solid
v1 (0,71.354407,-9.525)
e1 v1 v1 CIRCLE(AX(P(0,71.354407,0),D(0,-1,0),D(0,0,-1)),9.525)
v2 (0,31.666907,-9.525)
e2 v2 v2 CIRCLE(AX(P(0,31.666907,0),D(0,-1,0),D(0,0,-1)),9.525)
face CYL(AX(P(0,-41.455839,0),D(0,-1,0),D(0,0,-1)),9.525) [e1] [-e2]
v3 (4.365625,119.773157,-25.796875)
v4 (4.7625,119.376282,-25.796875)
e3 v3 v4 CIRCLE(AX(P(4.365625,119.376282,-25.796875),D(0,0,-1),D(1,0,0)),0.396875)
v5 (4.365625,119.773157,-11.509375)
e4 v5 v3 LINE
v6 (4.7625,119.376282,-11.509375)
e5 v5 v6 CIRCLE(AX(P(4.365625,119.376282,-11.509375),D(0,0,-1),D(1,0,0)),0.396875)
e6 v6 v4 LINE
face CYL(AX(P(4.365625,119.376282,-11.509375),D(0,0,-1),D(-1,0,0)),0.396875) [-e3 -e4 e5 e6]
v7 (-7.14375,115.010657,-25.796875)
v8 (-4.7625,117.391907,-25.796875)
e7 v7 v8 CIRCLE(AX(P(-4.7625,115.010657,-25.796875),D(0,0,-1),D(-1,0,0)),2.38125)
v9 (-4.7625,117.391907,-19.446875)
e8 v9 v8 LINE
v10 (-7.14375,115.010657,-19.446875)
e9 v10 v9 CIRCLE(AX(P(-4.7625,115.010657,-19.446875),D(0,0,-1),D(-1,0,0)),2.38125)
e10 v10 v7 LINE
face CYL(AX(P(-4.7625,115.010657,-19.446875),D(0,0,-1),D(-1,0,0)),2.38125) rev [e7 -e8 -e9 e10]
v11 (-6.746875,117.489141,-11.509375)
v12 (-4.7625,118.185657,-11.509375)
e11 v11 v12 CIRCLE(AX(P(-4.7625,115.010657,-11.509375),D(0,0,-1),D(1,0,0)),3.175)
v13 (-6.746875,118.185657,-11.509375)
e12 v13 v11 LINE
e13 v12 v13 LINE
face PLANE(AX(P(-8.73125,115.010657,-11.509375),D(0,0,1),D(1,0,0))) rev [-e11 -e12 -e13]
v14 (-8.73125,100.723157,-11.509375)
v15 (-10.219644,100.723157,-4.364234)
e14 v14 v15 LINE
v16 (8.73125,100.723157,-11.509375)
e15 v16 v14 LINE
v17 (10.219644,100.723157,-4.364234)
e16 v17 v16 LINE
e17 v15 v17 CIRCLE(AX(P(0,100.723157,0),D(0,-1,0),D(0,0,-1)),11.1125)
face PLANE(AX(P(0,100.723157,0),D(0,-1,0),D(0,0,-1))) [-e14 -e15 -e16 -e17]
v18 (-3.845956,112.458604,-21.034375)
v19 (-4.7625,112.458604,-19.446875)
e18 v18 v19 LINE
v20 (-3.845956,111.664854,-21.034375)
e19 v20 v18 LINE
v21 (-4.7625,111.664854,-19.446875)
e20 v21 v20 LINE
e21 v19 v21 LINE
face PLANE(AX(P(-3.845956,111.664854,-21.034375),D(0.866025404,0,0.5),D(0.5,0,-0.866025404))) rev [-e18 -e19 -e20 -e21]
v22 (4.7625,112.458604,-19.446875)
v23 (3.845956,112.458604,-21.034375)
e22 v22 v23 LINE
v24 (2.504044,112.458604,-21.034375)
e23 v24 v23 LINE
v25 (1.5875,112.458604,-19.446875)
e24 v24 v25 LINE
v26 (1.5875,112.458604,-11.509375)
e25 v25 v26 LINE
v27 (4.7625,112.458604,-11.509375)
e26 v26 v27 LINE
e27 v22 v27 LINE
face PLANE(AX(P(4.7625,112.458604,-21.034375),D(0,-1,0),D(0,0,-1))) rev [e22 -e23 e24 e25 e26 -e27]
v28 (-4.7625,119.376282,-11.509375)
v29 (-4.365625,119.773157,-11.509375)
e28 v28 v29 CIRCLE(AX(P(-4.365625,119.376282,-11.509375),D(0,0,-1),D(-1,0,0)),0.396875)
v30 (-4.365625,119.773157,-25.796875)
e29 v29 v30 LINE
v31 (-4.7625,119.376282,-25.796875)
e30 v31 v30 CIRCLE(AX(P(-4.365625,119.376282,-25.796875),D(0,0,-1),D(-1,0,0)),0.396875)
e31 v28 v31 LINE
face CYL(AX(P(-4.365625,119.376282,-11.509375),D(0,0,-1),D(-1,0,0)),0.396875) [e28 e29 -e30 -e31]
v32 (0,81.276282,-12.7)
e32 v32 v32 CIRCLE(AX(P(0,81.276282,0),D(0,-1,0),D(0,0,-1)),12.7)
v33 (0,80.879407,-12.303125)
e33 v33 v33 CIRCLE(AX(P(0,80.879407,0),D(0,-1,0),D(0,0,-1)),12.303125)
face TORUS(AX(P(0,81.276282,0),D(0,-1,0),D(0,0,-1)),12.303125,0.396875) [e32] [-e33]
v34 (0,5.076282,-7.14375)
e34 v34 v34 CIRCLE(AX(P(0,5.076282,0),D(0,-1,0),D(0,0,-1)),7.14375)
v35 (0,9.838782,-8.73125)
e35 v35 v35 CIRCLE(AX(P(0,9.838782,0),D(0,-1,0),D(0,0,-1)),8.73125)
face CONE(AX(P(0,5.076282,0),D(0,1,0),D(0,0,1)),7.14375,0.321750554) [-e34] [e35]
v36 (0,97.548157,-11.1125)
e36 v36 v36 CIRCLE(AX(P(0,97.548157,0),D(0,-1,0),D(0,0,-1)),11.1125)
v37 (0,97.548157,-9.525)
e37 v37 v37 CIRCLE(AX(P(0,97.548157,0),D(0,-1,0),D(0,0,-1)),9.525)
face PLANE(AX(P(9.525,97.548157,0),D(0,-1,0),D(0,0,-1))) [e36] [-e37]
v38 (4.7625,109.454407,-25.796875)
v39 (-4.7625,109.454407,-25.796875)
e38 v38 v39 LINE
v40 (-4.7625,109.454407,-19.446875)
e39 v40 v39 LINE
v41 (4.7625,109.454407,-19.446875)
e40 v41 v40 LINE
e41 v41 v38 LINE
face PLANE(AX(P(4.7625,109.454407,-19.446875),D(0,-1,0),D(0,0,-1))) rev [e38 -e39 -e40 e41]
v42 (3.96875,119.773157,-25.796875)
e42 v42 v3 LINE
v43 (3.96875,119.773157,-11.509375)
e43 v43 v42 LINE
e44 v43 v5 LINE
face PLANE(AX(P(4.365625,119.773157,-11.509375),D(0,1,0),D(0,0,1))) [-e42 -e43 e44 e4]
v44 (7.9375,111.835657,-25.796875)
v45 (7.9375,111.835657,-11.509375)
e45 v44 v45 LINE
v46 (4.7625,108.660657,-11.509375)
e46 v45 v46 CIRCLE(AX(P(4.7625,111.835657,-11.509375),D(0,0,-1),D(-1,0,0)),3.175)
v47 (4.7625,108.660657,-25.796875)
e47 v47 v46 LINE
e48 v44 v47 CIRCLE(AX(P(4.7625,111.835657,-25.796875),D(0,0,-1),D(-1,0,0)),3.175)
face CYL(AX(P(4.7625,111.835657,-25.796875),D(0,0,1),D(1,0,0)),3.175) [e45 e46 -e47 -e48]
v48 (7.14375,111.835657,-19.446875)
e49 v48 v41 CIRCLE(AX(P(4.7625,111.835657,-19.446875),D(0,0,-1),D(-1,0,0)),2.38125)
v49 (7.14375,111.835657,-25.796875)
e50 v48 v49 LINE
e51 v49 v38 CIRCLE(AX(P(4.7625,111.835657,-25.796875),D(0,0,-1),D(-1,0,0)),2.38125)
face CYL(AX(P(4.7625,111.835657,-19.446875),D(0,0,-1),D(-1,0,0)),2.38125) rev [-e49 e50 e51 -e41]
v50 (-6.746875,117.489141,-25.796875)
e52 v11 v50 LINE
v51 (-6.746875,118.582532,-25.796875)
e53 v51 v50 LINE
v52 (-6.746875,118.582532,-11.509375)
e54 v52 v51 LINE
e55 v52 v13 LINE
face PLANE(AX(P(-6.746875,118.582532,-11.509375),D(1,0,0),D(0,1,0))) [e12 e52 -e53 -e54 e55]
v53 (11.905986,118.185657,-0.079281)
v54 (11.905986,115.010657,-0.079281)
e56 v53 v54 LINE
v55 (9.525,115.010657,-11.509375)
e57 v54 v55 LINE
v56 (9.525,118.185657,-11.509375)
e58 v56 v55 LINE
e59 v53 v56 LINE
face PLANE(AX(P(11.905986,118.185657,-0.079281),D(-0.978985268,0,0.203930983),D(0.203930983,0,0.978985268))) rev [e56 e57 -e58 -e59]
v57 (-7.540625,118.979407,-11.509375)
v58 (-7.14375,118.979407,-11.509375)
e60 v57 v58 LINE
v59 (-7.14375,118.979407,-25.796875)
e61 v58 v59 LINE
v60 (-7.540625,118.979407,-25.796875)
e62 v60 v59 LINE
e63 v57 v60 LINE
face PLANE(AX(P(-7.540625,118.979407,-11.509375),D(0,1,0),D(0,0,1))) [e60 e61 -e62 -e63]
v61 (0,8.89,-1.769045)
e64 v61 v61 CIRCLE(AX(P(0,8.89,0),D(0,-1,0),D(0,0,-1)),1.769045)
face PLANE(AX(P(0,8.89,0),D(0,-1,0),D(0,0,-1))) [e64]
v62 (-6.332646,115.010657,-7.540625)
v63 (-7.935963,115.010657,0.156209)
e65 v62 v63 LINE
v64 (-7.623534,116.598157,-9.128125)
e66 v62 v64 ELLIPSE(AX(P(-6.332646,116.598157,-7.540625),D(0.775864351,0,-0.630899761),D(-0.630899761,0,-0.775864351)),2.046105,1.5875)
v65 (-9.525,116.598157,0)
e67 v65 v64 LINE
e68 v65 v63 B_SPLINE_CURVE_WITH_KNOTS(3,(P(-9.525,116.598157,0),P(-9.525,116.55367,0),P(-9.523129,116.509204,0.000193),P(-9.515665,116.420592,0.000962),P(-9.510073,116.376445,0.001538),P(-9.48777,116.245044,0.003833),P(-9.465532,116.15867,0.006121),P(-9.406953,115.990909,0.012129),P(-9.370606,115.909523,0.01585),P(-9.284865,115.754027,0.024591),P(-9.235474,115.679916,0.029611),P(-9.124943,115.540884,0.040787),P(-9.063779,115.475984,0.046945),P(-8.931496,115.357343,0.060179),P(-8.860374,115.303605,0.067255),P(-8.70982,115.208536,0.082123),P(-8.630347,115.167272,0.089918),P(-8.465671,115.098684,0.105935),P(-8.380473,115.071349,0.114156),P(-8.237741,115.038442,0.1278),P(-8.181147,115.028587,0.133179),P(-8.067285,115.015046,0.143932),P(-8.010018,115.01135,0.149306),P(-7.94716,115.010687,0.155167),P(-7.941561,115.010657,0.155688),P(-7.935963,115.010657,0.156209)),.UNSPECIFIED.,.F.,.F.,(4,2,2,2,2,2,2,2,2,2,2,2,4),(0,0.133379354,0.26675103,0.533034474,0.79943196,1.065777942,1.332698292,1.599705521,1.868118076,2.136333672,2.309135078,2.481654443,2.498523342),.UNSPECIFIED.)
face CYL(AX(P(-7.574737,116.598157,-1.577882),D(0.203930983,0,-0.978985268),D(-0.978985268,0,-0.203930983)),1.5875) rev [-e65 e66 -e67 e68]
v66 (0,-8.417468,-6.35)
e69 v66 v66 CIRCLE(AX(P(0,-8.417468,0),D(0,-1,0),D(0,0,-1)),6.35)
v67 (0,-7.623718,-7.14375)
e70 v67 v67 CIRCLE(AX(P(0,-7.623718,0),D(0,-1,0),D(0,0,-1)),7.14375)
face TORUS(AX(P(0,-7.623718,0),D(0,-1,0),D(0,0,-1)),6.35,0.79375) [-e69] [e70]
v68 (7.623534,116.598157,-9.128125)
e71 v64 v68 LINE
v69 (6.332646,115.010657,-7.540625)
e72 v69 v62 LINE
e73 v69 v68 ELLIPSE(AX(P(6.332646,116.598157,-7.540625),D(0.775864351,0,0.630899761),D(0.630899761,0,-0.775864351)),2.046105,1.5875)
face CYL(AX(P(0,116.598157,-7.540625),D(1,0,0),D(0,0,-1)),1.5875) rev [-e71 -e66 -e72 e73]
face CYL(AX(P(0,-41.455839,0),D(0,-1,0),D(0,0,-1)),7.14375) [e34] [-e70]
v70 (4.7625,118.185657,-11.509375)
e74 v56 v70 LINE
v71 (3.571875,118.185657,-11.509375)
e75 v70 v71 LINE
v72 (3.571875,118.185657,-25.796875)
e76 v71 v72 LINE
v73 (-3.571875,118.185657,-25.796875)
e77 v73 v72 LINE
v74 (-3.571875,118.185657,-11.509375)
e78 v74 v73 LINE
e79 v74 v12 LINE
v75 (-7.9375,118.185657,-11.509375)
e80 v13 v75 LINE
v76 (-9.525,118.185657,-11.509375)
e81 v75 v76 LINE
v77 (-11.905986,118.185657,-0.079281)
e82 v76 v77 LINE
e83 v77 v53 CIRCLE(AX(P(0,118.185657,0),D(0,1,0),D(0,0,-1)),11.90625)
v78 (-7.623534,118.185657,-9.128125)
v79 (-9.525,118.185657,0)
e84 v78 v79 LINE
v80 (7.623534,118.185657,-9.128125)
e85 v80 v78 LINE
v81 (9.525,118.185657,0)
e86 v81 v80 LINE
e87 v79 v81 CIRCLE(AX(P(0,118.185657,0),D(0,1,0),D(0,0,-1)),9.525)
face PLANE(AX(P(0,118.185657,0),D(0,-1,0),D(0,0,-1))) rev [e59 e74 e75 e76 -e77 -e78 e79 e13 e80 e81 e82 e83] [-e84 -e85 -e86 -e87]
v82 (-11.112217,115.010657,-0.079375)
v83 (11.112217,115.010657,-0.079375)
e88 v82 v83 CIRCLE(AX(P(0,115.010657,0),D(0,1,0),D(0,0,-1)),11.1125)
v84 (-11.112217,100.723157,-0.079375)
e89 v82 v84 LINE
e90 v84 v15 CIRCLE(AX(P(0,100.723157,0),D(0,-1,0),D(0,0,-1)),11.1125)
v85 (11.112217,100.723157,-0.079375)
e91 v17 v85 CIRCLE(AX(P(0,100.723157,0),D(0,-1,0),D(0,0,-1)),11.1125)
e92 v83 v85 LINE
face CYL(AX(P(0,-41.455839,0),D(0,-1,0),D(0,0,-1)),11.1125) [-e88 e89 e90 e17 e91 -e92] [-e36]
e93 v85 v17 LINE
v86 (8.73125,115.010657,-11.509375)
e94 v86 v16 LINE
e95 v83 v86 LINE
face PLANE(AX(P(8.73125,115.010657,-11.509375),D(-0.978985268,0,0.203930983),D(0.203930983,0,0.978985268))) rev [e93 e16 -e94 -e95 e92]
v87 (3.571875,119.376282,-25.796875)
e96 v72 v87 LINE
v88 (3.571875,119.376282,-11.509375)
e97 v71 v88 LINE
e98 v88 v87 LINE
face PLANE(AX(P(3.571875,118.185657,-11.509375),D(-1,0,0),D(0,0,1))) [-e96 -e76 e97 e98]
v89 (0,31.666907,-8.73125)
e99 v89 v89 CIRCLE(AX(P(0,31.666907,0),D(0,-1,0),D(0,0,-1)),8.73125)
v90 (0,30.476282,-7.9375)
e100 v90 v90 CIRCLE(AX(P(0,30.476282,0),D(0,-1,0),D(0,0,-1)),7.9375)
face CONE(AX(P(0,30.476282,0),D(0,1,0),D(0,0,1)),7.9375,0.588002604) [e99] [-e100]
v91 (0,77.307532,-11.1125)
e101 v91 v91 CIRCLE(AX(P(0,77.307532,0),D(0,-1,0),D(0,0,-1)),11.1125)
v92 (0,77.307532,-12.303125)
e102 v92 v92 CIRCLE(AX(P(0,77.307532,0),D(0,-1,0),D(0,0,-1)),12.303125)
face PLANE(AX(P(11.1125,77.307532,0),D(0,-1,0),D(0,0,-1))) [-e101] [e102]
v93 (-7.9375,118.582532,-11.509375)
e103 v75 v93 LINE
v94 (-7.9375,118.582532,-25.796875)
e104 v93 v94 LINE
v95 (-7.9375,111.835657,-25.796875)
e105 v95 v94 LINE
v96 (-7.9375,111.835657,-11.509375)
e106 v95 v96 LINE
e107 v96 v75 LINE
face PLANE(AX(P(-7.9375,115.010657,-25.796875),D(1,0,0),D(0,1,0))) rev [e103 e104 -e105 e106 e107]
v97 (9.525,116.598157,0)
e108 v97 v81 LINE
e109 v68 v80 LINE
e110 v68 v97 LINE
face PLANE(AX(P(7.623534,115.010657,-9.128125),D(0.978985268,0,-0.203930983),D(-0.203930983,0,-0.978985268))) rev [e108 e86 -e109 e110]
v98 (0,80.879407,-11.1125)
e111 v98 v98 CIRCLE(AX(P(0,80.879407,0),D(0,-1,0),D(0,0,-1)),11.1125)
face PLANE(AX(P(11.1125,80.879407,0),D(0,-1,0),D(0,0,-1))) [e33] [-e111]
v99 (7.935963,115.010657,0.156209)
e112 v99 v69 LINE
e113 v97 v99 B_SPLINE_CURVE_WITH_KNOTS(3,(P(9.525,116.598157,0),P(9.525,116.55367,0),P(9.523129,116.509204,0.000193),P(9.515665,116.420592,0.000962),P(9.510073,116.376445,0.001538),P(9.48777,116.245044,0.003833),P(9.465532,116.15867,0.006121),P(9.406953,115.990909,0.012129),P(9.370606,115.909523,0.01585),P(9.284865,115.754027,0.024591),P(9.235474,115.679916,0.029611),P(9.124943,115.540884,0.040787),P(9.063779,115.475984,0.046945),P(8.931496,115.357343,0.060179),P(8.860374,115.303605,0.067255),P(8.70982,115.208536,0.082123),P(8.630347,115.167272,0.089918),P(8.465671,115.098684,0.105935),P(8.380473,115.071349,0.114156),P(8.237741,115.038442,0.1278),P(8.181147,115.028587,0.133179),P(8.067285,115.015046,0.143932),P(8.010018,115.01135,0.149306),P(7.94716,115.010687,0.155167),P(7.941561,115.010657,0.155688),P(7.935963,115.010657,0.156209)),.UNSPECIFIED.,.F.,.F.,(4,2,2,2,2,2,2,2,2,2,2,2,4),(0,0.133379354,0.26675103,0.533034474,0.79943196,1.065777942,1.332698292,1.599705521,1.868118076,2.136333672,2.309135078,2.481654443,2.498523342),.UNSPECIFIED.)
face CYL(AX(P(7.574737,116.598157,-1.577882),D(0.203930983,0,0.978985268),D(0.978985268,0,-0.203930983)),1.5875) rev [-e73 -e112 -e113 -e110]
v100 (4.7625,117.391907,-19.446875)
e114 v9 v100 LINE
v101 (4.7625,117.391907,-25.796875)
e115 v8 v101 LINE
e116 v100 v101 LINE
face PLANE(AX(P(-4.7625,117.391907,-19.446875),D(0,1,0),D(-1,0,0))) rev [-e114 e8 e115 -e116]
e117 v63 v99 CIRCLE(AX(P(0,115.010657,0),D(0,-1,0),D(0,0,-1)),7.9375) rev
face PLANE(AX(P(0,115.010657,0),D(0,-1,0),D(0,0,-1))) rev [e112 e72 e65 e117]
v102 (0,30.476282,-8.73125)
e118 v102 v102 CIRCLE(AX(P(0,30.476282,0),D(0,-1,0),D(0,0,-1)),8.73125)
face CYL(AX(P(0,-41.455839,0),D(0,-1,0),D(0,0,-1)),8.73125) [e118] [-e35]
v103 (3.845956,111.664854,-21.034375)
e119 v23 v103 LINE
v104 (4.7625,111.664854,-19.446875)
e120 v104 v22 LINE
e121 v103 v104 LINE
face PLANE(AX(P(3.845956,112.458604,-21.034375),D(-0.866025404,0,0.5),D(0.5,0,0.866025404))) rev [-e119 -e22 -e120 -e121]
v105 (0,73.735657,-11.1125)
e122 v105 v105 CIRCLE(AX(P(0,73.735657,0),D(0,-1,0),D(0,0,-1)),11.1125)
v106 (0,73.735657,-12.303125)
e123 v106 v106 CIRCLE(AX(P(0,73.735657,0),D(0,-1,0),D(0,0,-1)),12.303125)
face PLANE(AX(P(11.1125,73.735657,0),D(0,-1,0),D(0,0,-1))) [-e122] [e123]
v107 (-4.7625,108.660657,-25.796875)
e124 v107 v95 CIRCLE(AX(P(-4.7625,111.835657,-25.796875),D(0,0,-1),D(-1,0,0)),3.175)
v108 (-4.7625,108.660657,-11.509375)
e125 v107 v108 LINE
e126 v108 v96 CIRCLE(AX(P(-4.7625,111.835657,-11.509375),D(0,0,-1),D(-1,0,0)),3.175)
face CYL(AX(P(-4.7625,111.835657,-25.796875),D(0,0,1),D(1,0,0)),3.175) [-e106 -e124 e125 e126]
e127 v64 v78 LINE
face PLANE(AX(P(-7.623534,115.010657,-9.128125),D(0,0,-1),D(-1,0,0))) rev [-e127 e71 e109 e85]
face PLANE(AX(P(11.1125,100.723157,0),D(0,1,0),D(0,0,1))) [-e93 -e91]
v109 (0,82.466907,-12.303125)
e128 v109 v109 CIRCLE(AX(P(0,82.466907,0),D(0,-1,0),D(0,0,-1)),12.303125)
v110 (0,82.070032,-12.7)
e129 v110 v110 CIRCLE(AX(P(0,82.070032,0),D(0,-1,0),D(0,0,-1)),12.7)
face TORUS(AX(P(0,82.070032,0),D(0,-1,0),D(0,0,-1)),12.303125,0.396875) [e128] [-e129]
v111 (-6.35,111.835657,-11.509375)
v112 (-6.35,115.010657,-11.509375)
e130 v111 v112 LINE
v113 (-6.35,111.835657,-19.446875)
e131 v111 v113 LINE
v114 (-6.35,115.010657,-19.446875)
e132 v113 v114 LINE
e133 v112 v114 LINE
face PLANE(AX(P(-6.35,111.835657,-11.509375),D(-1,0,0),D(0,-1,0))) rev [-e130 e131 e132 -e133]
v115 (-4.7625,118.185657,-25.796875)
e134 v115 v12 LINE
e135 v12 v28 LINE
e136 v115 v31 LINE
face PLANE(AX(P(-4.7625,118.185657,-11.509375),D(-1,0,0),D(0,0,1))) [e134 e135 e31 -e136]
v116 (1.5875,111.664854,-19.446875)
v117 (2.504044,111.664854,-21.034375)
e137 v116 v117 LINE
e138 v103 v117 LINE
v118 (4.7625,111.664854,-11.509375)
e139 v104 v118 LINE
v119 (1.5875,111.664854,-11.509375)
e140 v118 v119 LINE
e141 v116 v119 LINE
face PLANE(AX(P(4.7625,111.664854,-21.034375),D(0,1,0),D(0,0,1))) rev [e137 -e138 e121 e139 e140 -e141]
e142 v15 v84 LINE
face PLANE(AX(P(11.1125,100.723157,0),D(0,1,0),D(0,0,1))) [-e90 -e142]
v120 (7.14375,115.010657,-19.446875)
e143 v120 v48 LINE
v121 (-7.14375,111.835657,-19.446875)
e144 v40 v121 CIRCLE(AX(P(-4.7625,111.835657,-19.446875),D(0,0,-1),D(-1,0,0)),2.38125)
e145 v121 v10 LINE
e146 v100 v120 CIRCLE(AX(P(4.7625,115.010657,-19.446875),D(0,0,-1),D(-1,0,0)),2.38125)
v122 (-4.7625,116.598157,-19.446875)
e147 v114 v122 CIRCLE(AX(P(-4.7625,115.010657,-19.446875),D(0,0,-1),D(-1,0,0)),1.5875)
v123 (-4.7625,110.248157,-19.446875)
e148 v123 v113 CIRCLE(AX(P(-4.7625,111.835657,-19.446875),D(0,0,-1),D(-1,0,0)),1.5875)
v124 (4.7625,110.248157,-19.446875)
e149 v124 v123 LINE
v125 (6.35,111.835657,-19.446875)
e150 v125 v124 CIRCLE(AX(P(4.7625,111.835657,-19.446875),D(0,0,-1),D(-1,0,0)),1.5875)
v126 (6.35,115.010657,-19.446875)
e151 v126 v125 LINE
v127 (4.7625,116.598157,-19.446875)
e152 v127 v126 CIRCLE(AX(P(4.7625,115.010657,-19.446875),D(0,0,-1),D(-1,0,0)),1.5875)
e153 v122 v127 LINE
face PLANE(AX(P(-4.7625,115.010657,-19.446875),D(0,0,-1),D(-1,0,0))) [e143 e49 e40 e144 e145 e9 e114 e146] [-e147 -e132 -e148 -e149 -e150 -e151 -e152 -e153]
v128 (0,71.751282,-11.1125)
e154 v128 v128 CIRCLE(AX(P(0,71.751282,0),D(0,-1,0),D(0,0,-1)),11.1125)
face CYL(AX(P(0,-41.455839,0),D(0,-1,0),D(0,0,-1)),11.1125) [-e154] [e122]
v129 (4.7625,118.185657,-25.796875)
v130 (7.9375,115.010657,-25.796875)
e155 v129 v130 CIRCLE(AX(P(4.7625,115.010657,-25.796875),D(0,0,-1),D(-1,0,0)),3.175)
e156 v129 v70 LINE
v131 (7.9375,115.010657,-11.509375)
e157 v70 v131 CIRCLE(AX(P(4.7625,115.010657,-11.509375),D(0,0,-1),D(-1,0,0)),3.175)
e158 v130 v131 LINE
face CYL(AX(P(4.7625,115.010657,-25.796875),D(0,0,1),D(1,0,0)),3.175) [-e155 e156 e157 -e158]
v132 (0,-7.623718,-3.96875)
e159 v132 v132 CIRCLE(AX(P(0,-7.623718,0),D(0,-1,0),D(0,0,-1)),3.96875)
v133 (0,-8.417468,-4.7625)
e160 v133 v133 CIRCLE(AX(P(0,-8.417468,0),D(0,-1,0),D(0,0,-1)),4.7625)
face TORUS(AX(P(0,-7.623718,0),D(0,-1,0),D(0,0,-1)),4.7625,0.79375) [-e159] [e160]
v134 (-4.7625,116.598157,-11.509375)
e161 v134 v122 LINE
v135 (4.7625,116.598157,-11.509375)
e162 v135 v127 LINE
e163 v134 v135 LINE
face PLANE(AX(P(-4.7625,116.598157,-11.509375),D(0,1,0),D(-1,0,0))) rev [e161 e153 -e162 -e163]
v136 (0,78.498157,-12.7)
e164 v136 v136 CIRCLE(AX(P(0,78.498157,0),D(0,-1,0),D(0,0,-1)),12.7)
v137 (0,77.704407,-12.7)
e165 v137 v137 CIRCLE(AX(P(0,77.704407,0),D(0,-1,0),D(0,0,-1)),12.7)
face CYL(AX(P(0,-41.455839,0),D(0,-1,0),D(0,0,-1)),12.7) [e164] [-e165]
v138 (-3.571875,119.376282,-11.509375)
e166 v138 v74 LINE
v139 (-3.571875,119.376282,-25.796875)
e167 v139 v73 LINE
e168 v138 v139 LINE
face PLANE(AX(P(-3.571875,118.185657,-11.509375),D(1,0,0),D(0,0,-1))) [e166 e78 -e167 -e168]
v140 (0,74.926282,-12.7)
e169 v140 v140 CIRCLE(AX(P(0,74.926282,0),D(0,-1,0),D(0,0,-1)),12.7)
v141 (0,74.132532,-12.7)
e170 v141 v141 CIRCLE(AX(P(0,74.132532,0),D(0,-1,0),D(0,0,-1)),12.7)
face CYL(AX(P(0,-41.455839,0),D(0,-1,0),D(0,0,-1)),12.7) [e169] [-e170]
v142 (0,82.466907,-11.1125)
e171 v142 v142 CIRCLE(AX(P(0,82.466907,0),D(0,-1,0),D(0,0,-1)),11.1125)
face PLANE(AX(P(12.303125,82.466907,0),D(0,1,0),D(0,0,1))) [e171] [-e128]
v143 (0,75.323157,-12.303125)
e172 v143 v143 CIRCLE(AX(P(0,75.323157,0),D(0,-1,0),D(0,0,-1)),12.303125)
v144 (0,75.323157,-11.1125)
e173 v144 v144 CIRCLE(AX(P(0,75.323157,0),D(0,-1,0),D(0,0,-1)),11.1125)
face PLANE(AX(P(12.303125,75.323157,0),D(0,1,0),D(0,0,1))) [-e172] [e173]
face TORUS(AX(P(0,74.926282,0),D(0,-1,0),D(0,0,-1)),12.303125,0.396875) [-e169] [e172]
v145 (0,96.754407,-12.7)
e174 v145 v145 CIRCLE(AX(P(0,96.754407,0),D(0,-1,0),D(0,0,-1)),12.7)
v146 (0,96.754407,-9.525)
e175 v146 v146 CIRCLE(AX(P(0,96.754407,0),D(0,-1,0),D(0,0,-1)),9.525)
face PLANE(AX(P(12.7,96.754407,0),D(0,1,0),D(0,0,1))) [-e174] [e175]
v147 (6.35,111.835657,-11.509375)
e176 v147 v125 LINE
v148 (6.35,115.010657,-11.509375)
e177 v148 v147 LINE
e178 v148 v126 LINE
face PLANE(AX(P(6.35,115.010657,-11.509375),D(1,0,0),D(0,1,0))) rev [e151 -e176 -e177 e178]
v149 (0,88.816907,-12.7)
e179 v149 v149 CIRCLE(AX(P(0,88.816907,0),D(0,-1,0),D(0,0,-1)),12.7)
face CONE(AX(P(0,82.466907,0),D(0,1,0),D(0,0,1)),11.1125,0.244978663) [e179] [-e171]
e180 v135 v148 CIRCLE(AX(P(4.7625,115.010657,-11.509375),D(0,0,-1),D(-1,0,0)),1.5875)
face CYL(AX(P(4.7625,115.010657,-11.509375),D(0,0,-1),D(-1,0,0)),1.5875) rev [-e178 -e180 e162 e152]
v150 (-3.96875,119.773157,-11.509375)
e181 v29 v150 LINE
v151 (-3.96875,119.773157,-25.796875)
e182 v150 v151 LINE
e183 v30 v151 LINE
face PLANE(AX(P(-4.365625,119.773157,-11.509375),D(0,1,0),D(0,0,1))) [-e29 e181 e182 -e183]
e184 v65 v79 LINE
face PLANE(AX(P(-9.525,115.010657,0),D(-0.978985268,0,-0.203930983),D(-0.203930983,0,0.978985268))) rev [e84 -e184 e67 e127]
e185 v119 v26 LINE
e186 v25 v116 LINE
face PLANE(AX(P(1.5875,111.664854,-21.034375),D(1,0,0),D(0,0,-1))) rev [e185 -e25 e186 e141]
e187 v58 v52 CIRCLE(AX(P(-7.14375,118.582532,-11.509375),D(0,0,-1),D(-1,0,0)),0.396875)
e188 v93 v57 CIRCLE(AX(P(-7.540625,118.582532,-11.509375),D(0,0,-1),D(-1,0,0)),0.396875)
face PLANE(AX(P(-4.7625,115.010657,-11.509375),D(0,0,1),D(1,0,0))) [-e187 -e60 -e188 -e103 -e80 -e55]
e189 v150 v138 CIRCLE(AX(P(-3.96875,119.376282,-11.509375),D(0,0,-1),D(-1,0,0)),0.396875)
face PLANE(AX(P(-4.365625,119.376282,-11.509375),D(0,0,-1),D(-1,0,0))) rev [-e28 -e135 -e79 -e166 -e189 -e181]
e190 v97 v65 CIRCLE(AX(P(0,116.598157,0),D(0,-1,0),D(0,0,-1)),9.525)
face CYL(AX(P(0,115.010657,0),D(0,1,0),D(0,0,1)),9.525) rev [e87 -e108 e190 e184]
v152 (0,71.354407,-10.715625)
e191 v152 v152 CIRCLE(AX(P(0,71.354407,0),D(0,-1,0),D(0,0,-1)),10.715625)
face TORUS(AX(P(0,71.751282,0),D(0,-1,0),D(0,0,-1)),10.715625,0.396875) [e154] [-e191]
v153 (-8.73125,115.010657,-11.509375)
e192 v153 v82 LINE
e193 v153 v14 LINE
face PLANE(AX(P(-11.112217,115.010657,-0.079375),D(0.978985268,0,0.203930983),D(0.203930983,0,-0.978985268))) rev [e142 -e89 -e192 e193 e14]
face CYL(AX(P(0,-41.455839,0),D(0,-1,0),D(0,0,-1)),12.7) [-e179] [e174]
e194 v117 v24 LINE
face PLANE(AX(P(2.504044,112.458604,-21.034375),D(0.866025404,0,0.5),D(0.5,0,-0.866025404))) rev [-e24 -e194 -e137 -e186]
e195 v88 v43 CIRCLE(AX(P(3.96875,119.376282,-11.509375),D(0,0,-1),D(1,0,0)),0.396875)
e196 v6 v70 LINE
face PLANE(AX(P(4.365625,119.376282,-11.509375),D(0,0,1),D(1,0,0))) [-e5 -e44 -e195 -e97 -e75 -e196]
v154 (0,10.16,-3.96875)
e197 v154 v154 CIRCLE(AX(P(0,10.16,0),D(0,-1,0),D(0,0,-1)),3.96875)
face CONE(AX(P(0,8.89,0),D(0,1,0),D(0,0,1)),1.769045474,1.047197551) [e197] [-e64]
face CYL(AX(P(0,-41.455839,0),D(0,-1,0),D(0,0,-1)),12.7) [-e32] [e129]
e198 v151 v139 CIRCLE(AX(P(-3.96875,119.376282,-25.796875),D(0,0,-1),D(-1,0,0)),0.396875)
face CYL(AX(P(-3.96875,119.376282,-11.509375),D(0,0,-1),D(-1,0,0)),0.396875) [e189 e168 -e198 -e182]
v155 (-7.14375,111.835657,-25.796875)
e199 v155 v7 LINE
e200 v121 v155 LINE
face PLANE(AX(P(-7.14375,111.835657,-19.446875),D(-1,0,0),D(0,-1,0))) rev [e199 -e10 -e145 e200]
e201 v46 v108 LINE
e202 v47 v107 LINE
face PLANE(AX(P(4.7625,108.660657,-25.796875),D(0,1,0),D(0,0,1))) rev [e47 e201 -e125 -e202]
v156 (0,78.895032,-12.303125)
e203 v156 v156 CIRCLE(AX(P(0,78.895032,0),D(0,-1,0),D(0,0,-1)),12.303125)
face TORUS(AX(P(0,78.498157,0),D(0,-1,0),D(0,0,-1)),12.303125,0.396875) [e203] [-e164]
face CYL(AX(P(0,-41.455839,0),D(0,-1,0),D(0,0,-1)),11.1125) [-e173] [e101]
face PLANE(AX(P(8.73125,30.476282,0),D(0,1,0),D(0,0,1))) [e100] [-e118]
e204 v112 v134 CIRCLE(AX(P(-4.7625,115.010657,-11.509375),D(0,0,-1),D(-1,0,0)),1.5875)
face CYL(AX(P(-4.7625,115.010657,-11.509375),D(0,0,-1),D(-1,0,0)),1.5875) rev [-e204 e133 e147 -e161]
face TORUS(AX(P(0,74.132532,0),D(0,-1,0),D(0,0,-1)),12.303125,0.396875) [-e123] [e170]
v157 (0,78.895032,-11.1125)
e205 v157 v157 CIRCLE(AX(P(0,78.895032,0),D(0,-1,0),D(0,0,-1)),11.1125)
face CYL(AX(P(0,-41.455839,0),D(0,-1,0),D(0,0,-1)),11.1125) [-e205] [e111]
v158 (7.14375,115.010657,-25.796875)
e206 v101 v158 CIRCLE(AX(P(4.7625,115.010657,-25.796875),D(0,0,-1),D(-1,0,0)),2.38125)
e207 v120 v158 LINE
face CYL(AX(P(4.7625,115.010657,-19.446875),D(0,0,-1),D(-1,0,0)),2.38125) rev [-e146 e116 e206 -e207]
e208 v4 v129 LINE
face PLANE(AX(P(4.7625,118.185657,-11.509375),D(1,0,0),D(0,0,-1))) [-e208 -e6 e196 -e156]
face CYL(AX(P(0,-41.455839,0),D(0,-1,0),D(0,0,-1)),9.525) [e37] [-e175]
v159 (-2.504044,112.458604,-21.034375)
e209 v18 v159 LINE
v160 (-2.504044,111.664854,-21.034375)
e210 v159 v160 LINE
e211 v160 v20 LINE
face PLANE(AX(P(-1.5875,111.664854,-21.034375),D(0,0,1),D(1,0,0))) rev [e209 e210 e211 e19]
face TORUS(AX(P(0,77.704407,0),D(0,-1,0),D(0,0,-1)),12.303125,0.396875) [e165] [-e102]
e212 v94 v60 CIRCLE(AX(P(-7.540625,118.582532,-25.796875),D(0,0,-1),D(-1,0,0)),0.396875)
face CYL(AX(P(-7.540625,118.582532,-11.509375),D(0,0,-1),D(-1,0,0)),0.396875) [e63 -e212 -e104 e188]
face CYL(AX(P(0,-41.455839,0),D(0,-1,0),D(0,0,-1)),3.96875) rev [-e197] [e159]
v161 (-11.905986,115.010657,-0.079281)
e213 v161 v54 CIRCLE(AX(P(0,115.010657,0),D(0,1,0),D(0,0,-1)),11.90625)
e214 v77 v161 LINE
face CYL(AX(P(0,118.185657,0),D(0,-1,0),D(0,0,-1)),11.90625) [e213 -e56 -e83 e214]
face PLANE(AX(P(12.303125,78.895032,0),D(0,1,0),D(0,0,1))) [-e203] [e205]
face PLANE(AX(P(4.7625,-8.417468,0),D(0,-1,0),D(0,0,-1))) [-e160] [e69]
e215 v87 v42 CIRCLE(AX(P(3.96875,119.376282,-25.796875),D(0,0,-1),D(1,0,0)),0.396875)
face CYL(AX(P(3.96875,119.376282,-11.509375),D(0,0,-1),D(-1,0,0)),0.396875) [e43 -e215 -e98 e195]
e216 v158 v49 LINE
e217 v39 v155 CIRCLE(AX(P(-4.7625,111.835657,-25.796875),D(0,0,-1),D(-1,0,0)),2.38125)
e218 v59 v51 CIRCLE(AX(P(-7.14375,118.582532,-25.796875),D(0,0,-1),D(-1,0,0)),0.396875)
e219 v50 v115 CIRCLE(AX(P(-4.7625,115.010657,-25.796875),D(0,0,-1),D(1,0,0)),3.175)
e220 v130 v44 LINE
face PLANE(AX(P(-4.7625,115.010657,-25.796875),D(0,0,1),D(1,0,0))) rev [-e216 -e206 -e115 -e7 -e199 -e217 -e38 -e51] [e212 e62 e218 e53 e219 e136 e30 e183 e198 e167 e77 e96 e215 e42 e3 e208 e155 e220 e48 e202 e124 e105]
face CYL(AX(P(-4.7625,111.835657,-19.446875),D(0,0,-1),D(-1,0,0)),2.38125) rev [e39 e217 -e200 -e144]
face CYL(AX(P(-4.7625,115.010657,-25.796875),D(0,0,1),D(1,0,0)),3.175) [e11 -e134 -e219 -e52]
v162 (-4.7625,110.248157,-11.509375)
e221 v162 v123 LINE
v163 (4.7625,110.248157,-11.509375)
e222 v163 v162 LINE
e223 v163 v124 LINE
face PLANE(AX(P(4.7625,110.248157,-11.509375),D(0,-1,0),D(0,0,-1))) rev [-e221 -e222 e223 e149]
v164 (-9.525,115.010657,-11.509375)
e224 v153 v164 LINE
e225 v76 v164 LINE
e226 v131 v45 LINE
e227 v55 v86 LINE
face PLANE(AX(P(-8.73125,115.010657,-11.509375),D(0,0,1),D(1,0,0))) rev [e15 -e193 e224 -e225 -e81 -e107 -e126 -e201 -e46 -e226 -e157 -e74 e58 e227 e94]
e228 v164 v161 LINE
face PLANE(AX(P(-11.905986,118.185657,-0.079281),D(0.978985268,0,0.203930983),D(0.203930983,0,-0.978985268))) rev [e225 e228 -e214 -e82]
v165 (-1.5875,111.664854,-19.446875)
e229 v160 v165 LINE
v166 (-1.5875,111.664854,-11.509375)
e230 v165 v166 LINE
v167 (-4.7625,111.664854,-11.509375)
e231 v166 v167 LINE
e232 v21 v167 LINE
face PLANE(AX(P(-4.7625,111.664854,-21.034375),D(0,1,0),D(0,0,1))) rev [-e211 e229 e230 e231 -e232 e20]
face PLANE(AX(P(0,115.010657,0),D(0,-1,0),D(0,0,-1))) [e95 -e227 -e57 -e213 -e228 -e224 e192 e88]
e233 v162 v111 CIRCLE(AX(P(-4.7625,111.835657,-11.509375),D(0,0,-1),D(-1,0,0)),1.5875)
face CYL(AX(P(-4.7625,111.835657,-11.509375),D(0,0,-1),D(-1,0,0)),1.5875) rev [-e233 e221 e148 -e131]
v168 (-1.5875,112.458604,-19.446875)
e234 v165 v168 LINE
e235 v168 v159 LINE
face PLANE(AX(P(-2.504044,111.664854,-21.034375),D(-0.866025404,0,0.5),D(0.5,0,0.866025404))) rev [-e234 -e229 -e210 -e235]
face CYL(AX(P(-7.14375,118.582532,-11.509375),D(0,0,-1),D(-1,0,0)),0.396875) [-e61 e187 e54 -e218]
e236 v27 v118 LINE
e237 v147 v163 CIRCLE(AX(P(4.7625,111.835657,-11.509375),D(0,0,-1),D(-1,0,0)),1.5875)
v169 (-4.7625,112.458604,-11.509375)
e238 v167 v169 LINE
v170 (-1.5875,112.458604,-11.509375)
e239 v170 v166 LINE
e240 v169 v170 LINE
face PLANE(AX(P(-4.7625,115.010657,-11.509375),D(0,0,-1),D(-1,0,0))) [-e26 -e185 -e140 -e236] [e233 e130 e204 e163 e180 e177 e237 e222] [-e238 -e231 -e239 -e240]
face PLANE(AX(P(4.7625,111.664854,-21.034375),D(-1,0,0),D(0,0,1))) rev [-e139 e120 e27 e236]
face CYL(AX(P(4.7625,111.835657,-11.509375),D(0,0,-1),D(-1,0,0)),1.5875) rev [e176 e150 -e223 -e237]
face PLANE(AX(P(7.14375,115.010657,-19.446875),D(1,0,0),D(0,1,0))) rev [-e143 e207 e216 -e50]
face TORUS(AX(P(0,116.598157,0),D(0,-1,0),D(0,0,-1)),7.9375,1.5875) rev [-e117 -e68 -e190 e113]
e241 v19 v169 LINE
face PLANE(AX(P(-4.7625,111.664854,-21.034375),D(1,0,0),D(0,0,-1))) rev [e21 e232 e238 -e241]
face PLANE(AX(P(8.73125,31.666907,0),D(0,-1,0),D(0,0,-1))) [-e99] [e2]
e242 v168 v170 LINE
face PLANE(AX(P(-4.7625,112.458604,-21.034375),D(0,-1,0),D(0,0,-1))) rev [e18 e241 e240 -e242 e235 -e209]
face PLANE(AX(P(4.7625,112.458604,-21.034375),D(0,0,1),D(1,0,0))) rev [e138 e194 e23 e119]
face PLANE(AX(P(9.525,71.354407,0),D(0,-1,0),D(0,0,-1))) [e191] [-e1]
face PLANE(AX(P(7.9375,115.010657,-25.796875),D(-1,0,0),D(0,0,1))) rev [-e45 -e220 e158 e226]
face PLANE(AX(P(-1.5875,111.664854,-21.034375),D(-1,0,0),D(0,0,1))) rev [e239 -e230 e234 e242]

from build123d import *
from OCP.BRepFilletAPI import BRepFilletAPI_MakeChamfer

# Parameters (mm, degrees)
EXTRUDE1_START     = 14.2875
EXTRUDE1_DEPTH     = 14.2875
EXTRUDE2_DEPTH     = 3.175
CUT_EXTRUDE1_DEPTH = 3.175
FILLET1_R          = 1.5875
EXTRUDE3_DEPTH     = 14.2875
CUT_EXTRUDE6_DEPTH = 6.35
CUT_EXTRUDE7_DEPTH = 7.9375
SKETCH10_W         = 3.175
SKETCH10_H         = 0.79375
EXTRUDE5_DEPTH     = 9.525
CHAMFER1_SIZE      = 1.5875
CHAMFER1_SIZE2     = 0.916543552
EXTRUDE6_START     = -14.2875
EXTRUDE6_DEPTH     = 14.2875


with BuildPart() as part:
    # Sketch1 → Revolve1 (revolve)
    with BuildSketch(Plane.XY, mode=Mode.PRIVATE) as revolve1_sk:
        with BuildLine():
            Line((0, 8.89), (1.769045474, 8.89))
            Line((1.769045474, 8.89), (3.96875, 10.16))
            Line((3.96875, 10.16), (3.96875, -7.623717928))
            ThreePointArc((3.96875, -7.623717928), (4.201233992, -8.184983936), (4.7625, -8.417467928))
            Line((4.7625, -8.417467928), (6.35, -8.417467928))
            ThreePointArc((6.35, -8.417467928), (6.911266008, -8.184983936), (7.14375, -7.623717928))
            Line((7.14375, -7.623717928), (7.14375, 5.076282072))
            Line((7.14375, 5.076282072), (8.73125, 9.838782072))
            Line((8.73125, 9.838782072), (8.73125, 30.476282072))
            Line((8.73125, 30.476282072), (7.9375, 30.476282072))
            Line((7.9375, 30.476282072), (8.73125, 31.666907072))
            Line((8.73125, 31.666907072), (9.525, 31.666907072))
            Line((9.525, 31.666907072), (9.525, 71.354407072))
            Line((9.525, 71.354407072), (10.715625, 71.354407072))
            ThreePointArc((10.715625, 71.354407072), (10.996258004, 71.470649068), (11.1125, 71.751282072))
            Line((11.1125, 71.751282072), (11.1125, 73.735657072))
            Line((11.1125, 73.735657072), (12.303125, 73.735657072))
            ThreePointArc((12.303125, 73.735657072), (12.583758004, 73.851899068), (12.7, 74.132532072))
            Line((12.7, 74.132532072), (12.7, 74.926282072))
            ThreePointArc((12.7, 74.926282072), (12.583758004, 75.206915075), (12.303125, 75.323157072))
            Line((12.303125, 75.323157072), (11.1125, 75.323157072))
            Line((11.1125, 75.323157072), (11.1125, 77.307532072))
            Line((11.1125, 77.307532072), (12.303125, 77.307532072))
            ThreePointArc((12.303125, 77.307532072), (12.583758004, 77.423774068), (12.7, 77.704407072))
            Line((12.7, 77.704407072), (12.7, 78.498157072))
            ThreePointArc((12.7, 78.498157072), (12.583758004, 78.778790075), (12.303125, 78.895032072))
            Line((12.303125, 78.895032072), (11.1125, 78.895032072))
            Line((11.1125, 78.895032072), (11.1125, 80.879407072))
            Line((11.1125, 80.879407072), (12.303125, 80.879407072))
            ThreePointArc((12.303125, 80.879407072), (12.583758004, 80.995649068), (12.7, 81.276282072))
            Line((12.7, 81.276282072), (12.7, 82.070032072))
            ThreePointArc((12.7, 82.070032072), (12.583758004, 82.350665075), (12.303125, 82.466907072))
            Line((12.303125, 82.466907072), (11.1125, 82.466907072))
            Line((11.1125, 82.466907072), (12.7, 88.816907072))
            Line((12.7, 88.816907072), (12.7, 96.754407072))
            Line((12.7, 96.754407072), (9.525, 96.754407072))
            Line((9.525, 96.754407072), (9.525, 97.548157072))
            Line((9.525, 97.548157072), (11.1125, 97.548157072))
            Line((11.1125, 97.548157072), (11.1125, 100.723157072))
            Line((11.1125, 100.723157072), (0, 100.723157072))
            Line((0, 100.723157072), (0, 8.89))
        make_face()
    revolve(revolve1_sk.sketch.rotate(Axis((0, -41.455838842, 0), (0, 1, 0)), 90), axis=Axis((0, -41.455838842, 0), (0, 1, 0)))

    # Sketch2 → Extrude1 (add)
    with BuildSketch(Plane(origin=(0, 100.723157072, 0), x_dir=(-1, 0, 0), z_dir=(0, 1, 0)).offset(EXTRUDE1_START)):
        with BuildLine():
            Line((8.73125, -11.509375), (-8.73125, -11.509375))
            Line((-8.73125, -11.509375), (-11.112216514, -0.079375))
            ThreePointArc((-11.112216514, -0.079375), (0, 11.1125), (11.112216514, -0.079375))
            Line((11.112216514, -0.079375), (8.73125, -11.509375))
        make_face()
    extrude(amount=-EXTRUDE1_DEPTH)

    # Sketch3 → Extrude2 (add)
    with BuildSketch(Plane(origin=(0, 115.010657072, 0), x_dir=(-1, 0, 0), z_dir=(0, 1, 0))):
        with BuildLine():
            Line((9.525, -11.509375), (-9.525, -11.509375))
            Line((-9.525, -11.509375), (-11.905986038, -0.079281274))
            ThreePointArc((-11.905986038, -0.079281274), (0, 11.90625), (11.905986038, -0.079281274))
            Line((11.905986038, -0.079281274), (9.525, -11.509375))
        make_face()
    extrude(amount=EXTRUDE2_DEPTH)

    # Sketch4 → Cut-Extrude1 (cut)
    with BuildSketch(Plane(origin=(0, 118.185657072, 0), x_dir=(-1, 0, 0), z_dir=(0, 1, 0))):
        with BuildLine():
            Line((9.525, 0), (7.623533687, -9.128125))
            Line((7.623533687, -9.128125), (-7.623533687, -9.128125))
            Line((-7.623533687, -9.128125), (-9.525, 0))
            ThreePointArc((-9.525, 0), (0, 9.525), (9.525, 0))
        make_face()
    extrude(amount=-CUT_EXTRUDE1_DEPTH, mode=Mode.SUBTRACT)

    # Fillet1
    # the kernel refuses this fillet: 1.5875 mm, written as the material it adds along each edge
    with BuildSketch(Plane(origin=(0, 115.010657072, 0), x_dir=(0.9860987307491407, 0, -0.1661604441945603), z_dir=(-0.1661604441945603, 0, -0.9860987307491407))) as fillet1_piece_1:
        with BuildLine():
            CenterArc((9.525 - FILLET1_R, -FILLET1_R), FILLET1_R, 0, 90)
            Line((9.525 - FILLET1_R, 0), (9.525 - FILLET1_R, FILLET1_R * 0.02))
            Line((9.525 - FILLET1_R, FILLET1_R * 0.02), (9.525 + FILLET1_R * 0.02, FILLET1_R * 0.02))
            Line((9.525 + FILLET1_R * 0.02, FILLET1_R * 0.02), (9.525 + FILLET1_R * 0.02, -FILLET1_R))
            Line((9.525 + FILLET1_R * 0.02, -FILLET1_R), (9.525, -FILLET1_R))
        make_face()
    revolve(axis=Axis((0, 115.010657072, 0), (0, -1, 0)), revolution_arc=199.12930732)
    with BuildSketch(Plane(origin=(-9.848740436, 115.010657072, 1.554139112), x_dir=(0, 1, 0), z_dir=(0.203930983368504, 0, -0.9789852675205869)), Plane(origin=(7.29979325, 115.010657072, -10.682264112), x_dir=(0, 1, 0), z_dir=(0.20393098336850368, 0, 0.9789852675205869))) as fillet1_piece_2:
        with BuildLine():
            CenterArc((FILLET1_R, FILLET1_R), FILLET1_R, 180, 90)
            Line((0, FILLET1_R), (-FILLET1_R * 0.02, FILLET1_R))
            Line((-FILLET1_R * 0.02, FILLET1_R), (-FILLET1_R * 0.02, -FILLET1_R * 0.02))
            Line((-FILLET1_R * 0.02, -FILLET1_R * 0.02), (FILLET1_R, -FILLET1_R * 0.02))
            Line((FILLET1_R, -FILLET1_R * 0.02), (FILLET1_R, 0))
        make_face()
    extrude(amount=12.49906779)
    with BuildSketch(Plane(origin=(-9.211033687, 115.010657072, -9.128125), x_dir=(0, 1, 0), z_dir=(1, 0, 0))) as fillet1_piece_3:
        with BuildLine():
            CenterArc((FILLET1_R, FILLET1_R), FILLET1_R, 180, 90)
            Line((0, FILLET1_R), (-FILLET1_R * 0.02, FILLET1_R))
            Line((-FILLET1_R * 0.02, FILLET1_R), (-FILLET1_R * 0.02, -FILLET1_R * 0.02))
            Line((-FILLET1_R * 0.02, -FILLET1_R * 0.02), (FILLET1_R, -FILLET1_R * 0.02))
            Line((FILLET1_R, -FILLET1_R * 0.02), (FILLET1_R, 0))
        make_face()
    extrude(amount=18.422067373)

    # Sketch5 → Extrude3 (add)
    with BuildSketch(Plane(origin=(0, 0, -11.509375), x_dir=(-1, 0, 0), z_dir=(0, 0, -1))):
        with BuildLine():
            Line((-4.7625, 118.185657072), (4.7625, 118.185657072))
            ThreePointArc((4.7625, 118.185657072), (7.00756403, 117.255721102), (7.9375, 115.010657072))
            Line((7.9375, 115.010657072), (7.9375, 111.835657072))
            ThreePointArc((7.9375, 111.835657072), (7.00756403, 109.590593041), (4.7625, 108.660657072))
            Line((4.7625, 108.660657072), (-4.7625, 108.660657072))
            ThreePointArc((-4.7625, 108.660657072), (-7.00756403, 109.590593041), (-7.9375, 111.835657072))
            Line((-7.9375, 111.835657072), (-7.9375, 115.010657072))
            ThreePointArc((-7.9375, 115.010657072), (-7.00756403, 117.255721102), (-4.7625, 118.185657072))
        make_face()
    extrude(amount=EXTRUDE3_DEPTH)

    # Sketch8 → Cut-Extrude6 (cut)
    with BuildSketch(Plane(origin=(0, 0, -25.796875), x_dir=(-1, 0, 0), z_dir=(0, 0, -1))):
        with BuildLine():
            Line((4.7625, 117.391907072), (-4.7625, 117.391907072))
            ThreePointArc((-4.7625, 117.391907072), (-6.446298023, 116.694455094), (-7.14375, 115.010657072))
            Line((-7.14375, 115.010657072), (-7.14375, 111.835657072))
            ThreePointArc((-7.14375, 111.835657072), (-6.446298023, 110.151859049), (-4.7625, 109.454407072))
            Line((-4.7625, 109.454407072), (4.7625, 109.454407072))
            ThreePointArc((4.7625, 109.454407072), (6.446298023, 110.151859049), (7.14375, 111.835657072))
            Line((7.14375, 111.835657072), (7.14375, 115.010657072))
            ThreePointArc((7.14375, 115.010657072), (6.446298023, 116.694455094), (4.7625, 117.391907072))
        make_face()
    extrude(amount=-CUT_EXTRUDE6_DEPTH, mode=Mode.SUBTRACT)

    # Sketch9 → Cut-Extrude7 (cut)
    with BuildSketch(Plane(origin=(0, 0, -19.446875), x_dir=(-1, 0, 0), z_dir=(0, 0, -1))):
        with BuildLine():
            Line((4.7625, 116.598157072), (-4.7625, 116.598157072))
            ThreePointArc((-4.7625, 116.598157072), (-5.885032015, 116.133189087), (-6.35, 115.010657072))
            Line((-6.35, 115.010657072), (-6.35, 111.835657072))
            ThreePointArc((-6.35, 111.835657072), (-5.885032015, 110.713125056), (-4.7625, 110.248157072))
            Line((-4.7625, 110.248157072), (4.7625, 110.248157072))
            ThreePointArc((4.7625, 110.248157072), (5.885032015, 110.713125056), (6.35, 111.835657072))
            Line((6.35, 111.835657072), (6.35, 115.010657072))
            ThreePointArc((6.35, 115.010657072), (5.885032015, 116.133189087), (4.7625, 116.598157072))
        make_face()
    extrude(amount=-CUT_EXTRUDE7_DEPTH, mode=Mode.SUBTRACT)

    # Sketch10 → Extrude5 (add)
    with BuildSketch(Plane(origin=(0, 0, -11.509375), x_dir=(-1, 0, 0), z_dir=(0, 0, -1))):
        with Locations((-3.175, 112.061729045)):
            Rectangle(SKETCH10_W, SKETCH10_H)
        with Locations((3.175, 112.061729045)):
            Rectangle(SKETCH10_W, SKETCH10_H)
    extrude(amount=EXTRUDE5_DEPTH)

    # Chamfer1: one chamfer whose edges measure the first distance from different faces: ONE call of the kernel's chamfer builder (chamfer() names one face for all edges)
    chamfer1_edges_1 = [part.edges().sort_by_distance(p)[0] for p in [
        (4.7625, 112.061729045, -21.034375),
    ]]
    chamfer1_side_1 = [part.faces().sort_by_distance(p)[0] for p in [
        (4.7625, 112.061729045, -16.271875),
    ]]
    chamfer1_edges_2 = [part.edges().sort_by_distance(p)[0] for p in [
        (1.5875, 112.061729045, -21.034375),
    ]]
    chamfer1_side_2 = [part.faces().sort_by_distance(p)[0] for p in [
        (1.5875, 112.061729045, -16.271875),
    ]]
    chamfer1_edges_3 = [part.edges().sort_by_distance(p)[0] for p in [
        (-4.7625, 112.061729045, -21.034375),
    ]]
    chamfer1_side_3 = [part.faces().sort_by_distance(p)[0] for p in [
        (-4.7625, 112.061729045, -16.271875),
    ]]
    chamfer1_edges_4 = [part.edges().sort_by_distance(p)[0] for p in [
        (-1.5875, 112.061729045, -21.034375),
    ]]
    chamfer1_side_4 = [part.faces().sort_by_distance(p)[0] for p in [
        (-1.5875, 112.061729045, -16.271875),
    ]]
    chamfer1 = BRepFilletAPI_MakeChamfer(part.part.solid().wrapped)
    for e in chamfer1_edges_1:
        chamfer1.Add(CHAMFER1_SIZE, CHAMFER1_SIZE2, e.wrapped, chamfer1_side_1[0].wrapped)  # the first distance lies on this face
    for e in chamfer1_edges_2:
        chamfer1.Add(CHAMFER1_SIZE, CHAMFER1_SIZE2, e.wrapped, chamfer1_side_2[0].wrapped)  # the first distance lies on this face
    for e in chamfer1_edges_3:
        chamfer1.Add(CHAMFER1_SIZE, CHAMFER1_SIZE2, e.wrapped, chamfer1_side_3[0].wrapped)  # the first distance lies on this face
    for e in chamfer1_edges_4:
        chamfer1.Add(CHAMFER1_SIZE, CHAMFER1_SIZE2, e.wrapped, chamfer1_side_4[0].wrapped)  # the first distance lies on this face
    add(Compound.cast(chamfer1.Shape()), mode=Mode.REPLACE)

    # Sketch11 → Extrude6 (add)
    with BuildSketch(Plane(origin=(0, 0, -25.796875), x_dir=(-1, 0, 0), z_dir=(0, 0, -1)).offset(EXTRUDE6_START)):
        with BuildLine():
            Line((7.9375, 115.010657072), (7.9375, 118.582532072))
            ThreePointArc((7.9375, 118.582532072), (7.821258004, 118.863165075), (7.540625, 118.979407072))
            Line((7.540625, 118.979407072), (7.14375, 118.979407072))
            ThreePointArc((7.14375, 118.979407072), (6.863116996, 118.863165075), (6.746875, 118.582532072))
            Line((6.746875, 118.582532072), (6.746875, 117.489140652))
            ThreePointArc((6.746875, 117.489140652), (7.624406325, 116.3854724), (7.9375, 115.010657072))
        make_face()
        with BuildLine():
            Line((-4.7625, 118.185657072), (-3.571875, 118.185657072))
            Line((-3.571875, 118.185657072), (-3.571875, 119.376282072))
            ThreePointArc((-3.571875, 119.376282072), (-3.688116996, 119.656915075), (-3.96875, 119.773157072))
            Line((-3.96875, 119.773157072), (-4.365625, 119.773157072))
            ThreePointArc((-4.365625, 119.773157072), (-4.646258004, 119.656915075), (-4.7625, 119.376282072))
            Line((-4.7625, 119.376282072), (-4.7625, 118.185657072))
        make_face()
        with BuildLine():
            Line((4.7625, 118.185657072), (3.571875, 118.185657072))
            Line((3.571875, 118.185657072), (3.571875, 119.376282072))
            ThreePointArc((3.571875, 119.376282072), (3.688116996, 119.656915075), (3.96875, 119.773157072))
            Line((3.96875, 119.773157072), (4.365625, 119.773157072))
            ThreePointArc((4.365625, 119.773157072), (4.646258004, 119.656915075), (4.7625, 119.376282072))
            Line((4.7625, 119.376282072), (4.7625, 118.185657072))
        make_face()
    extrude(amount=EXTRUDE6_DEPTH)


solid = part.part
